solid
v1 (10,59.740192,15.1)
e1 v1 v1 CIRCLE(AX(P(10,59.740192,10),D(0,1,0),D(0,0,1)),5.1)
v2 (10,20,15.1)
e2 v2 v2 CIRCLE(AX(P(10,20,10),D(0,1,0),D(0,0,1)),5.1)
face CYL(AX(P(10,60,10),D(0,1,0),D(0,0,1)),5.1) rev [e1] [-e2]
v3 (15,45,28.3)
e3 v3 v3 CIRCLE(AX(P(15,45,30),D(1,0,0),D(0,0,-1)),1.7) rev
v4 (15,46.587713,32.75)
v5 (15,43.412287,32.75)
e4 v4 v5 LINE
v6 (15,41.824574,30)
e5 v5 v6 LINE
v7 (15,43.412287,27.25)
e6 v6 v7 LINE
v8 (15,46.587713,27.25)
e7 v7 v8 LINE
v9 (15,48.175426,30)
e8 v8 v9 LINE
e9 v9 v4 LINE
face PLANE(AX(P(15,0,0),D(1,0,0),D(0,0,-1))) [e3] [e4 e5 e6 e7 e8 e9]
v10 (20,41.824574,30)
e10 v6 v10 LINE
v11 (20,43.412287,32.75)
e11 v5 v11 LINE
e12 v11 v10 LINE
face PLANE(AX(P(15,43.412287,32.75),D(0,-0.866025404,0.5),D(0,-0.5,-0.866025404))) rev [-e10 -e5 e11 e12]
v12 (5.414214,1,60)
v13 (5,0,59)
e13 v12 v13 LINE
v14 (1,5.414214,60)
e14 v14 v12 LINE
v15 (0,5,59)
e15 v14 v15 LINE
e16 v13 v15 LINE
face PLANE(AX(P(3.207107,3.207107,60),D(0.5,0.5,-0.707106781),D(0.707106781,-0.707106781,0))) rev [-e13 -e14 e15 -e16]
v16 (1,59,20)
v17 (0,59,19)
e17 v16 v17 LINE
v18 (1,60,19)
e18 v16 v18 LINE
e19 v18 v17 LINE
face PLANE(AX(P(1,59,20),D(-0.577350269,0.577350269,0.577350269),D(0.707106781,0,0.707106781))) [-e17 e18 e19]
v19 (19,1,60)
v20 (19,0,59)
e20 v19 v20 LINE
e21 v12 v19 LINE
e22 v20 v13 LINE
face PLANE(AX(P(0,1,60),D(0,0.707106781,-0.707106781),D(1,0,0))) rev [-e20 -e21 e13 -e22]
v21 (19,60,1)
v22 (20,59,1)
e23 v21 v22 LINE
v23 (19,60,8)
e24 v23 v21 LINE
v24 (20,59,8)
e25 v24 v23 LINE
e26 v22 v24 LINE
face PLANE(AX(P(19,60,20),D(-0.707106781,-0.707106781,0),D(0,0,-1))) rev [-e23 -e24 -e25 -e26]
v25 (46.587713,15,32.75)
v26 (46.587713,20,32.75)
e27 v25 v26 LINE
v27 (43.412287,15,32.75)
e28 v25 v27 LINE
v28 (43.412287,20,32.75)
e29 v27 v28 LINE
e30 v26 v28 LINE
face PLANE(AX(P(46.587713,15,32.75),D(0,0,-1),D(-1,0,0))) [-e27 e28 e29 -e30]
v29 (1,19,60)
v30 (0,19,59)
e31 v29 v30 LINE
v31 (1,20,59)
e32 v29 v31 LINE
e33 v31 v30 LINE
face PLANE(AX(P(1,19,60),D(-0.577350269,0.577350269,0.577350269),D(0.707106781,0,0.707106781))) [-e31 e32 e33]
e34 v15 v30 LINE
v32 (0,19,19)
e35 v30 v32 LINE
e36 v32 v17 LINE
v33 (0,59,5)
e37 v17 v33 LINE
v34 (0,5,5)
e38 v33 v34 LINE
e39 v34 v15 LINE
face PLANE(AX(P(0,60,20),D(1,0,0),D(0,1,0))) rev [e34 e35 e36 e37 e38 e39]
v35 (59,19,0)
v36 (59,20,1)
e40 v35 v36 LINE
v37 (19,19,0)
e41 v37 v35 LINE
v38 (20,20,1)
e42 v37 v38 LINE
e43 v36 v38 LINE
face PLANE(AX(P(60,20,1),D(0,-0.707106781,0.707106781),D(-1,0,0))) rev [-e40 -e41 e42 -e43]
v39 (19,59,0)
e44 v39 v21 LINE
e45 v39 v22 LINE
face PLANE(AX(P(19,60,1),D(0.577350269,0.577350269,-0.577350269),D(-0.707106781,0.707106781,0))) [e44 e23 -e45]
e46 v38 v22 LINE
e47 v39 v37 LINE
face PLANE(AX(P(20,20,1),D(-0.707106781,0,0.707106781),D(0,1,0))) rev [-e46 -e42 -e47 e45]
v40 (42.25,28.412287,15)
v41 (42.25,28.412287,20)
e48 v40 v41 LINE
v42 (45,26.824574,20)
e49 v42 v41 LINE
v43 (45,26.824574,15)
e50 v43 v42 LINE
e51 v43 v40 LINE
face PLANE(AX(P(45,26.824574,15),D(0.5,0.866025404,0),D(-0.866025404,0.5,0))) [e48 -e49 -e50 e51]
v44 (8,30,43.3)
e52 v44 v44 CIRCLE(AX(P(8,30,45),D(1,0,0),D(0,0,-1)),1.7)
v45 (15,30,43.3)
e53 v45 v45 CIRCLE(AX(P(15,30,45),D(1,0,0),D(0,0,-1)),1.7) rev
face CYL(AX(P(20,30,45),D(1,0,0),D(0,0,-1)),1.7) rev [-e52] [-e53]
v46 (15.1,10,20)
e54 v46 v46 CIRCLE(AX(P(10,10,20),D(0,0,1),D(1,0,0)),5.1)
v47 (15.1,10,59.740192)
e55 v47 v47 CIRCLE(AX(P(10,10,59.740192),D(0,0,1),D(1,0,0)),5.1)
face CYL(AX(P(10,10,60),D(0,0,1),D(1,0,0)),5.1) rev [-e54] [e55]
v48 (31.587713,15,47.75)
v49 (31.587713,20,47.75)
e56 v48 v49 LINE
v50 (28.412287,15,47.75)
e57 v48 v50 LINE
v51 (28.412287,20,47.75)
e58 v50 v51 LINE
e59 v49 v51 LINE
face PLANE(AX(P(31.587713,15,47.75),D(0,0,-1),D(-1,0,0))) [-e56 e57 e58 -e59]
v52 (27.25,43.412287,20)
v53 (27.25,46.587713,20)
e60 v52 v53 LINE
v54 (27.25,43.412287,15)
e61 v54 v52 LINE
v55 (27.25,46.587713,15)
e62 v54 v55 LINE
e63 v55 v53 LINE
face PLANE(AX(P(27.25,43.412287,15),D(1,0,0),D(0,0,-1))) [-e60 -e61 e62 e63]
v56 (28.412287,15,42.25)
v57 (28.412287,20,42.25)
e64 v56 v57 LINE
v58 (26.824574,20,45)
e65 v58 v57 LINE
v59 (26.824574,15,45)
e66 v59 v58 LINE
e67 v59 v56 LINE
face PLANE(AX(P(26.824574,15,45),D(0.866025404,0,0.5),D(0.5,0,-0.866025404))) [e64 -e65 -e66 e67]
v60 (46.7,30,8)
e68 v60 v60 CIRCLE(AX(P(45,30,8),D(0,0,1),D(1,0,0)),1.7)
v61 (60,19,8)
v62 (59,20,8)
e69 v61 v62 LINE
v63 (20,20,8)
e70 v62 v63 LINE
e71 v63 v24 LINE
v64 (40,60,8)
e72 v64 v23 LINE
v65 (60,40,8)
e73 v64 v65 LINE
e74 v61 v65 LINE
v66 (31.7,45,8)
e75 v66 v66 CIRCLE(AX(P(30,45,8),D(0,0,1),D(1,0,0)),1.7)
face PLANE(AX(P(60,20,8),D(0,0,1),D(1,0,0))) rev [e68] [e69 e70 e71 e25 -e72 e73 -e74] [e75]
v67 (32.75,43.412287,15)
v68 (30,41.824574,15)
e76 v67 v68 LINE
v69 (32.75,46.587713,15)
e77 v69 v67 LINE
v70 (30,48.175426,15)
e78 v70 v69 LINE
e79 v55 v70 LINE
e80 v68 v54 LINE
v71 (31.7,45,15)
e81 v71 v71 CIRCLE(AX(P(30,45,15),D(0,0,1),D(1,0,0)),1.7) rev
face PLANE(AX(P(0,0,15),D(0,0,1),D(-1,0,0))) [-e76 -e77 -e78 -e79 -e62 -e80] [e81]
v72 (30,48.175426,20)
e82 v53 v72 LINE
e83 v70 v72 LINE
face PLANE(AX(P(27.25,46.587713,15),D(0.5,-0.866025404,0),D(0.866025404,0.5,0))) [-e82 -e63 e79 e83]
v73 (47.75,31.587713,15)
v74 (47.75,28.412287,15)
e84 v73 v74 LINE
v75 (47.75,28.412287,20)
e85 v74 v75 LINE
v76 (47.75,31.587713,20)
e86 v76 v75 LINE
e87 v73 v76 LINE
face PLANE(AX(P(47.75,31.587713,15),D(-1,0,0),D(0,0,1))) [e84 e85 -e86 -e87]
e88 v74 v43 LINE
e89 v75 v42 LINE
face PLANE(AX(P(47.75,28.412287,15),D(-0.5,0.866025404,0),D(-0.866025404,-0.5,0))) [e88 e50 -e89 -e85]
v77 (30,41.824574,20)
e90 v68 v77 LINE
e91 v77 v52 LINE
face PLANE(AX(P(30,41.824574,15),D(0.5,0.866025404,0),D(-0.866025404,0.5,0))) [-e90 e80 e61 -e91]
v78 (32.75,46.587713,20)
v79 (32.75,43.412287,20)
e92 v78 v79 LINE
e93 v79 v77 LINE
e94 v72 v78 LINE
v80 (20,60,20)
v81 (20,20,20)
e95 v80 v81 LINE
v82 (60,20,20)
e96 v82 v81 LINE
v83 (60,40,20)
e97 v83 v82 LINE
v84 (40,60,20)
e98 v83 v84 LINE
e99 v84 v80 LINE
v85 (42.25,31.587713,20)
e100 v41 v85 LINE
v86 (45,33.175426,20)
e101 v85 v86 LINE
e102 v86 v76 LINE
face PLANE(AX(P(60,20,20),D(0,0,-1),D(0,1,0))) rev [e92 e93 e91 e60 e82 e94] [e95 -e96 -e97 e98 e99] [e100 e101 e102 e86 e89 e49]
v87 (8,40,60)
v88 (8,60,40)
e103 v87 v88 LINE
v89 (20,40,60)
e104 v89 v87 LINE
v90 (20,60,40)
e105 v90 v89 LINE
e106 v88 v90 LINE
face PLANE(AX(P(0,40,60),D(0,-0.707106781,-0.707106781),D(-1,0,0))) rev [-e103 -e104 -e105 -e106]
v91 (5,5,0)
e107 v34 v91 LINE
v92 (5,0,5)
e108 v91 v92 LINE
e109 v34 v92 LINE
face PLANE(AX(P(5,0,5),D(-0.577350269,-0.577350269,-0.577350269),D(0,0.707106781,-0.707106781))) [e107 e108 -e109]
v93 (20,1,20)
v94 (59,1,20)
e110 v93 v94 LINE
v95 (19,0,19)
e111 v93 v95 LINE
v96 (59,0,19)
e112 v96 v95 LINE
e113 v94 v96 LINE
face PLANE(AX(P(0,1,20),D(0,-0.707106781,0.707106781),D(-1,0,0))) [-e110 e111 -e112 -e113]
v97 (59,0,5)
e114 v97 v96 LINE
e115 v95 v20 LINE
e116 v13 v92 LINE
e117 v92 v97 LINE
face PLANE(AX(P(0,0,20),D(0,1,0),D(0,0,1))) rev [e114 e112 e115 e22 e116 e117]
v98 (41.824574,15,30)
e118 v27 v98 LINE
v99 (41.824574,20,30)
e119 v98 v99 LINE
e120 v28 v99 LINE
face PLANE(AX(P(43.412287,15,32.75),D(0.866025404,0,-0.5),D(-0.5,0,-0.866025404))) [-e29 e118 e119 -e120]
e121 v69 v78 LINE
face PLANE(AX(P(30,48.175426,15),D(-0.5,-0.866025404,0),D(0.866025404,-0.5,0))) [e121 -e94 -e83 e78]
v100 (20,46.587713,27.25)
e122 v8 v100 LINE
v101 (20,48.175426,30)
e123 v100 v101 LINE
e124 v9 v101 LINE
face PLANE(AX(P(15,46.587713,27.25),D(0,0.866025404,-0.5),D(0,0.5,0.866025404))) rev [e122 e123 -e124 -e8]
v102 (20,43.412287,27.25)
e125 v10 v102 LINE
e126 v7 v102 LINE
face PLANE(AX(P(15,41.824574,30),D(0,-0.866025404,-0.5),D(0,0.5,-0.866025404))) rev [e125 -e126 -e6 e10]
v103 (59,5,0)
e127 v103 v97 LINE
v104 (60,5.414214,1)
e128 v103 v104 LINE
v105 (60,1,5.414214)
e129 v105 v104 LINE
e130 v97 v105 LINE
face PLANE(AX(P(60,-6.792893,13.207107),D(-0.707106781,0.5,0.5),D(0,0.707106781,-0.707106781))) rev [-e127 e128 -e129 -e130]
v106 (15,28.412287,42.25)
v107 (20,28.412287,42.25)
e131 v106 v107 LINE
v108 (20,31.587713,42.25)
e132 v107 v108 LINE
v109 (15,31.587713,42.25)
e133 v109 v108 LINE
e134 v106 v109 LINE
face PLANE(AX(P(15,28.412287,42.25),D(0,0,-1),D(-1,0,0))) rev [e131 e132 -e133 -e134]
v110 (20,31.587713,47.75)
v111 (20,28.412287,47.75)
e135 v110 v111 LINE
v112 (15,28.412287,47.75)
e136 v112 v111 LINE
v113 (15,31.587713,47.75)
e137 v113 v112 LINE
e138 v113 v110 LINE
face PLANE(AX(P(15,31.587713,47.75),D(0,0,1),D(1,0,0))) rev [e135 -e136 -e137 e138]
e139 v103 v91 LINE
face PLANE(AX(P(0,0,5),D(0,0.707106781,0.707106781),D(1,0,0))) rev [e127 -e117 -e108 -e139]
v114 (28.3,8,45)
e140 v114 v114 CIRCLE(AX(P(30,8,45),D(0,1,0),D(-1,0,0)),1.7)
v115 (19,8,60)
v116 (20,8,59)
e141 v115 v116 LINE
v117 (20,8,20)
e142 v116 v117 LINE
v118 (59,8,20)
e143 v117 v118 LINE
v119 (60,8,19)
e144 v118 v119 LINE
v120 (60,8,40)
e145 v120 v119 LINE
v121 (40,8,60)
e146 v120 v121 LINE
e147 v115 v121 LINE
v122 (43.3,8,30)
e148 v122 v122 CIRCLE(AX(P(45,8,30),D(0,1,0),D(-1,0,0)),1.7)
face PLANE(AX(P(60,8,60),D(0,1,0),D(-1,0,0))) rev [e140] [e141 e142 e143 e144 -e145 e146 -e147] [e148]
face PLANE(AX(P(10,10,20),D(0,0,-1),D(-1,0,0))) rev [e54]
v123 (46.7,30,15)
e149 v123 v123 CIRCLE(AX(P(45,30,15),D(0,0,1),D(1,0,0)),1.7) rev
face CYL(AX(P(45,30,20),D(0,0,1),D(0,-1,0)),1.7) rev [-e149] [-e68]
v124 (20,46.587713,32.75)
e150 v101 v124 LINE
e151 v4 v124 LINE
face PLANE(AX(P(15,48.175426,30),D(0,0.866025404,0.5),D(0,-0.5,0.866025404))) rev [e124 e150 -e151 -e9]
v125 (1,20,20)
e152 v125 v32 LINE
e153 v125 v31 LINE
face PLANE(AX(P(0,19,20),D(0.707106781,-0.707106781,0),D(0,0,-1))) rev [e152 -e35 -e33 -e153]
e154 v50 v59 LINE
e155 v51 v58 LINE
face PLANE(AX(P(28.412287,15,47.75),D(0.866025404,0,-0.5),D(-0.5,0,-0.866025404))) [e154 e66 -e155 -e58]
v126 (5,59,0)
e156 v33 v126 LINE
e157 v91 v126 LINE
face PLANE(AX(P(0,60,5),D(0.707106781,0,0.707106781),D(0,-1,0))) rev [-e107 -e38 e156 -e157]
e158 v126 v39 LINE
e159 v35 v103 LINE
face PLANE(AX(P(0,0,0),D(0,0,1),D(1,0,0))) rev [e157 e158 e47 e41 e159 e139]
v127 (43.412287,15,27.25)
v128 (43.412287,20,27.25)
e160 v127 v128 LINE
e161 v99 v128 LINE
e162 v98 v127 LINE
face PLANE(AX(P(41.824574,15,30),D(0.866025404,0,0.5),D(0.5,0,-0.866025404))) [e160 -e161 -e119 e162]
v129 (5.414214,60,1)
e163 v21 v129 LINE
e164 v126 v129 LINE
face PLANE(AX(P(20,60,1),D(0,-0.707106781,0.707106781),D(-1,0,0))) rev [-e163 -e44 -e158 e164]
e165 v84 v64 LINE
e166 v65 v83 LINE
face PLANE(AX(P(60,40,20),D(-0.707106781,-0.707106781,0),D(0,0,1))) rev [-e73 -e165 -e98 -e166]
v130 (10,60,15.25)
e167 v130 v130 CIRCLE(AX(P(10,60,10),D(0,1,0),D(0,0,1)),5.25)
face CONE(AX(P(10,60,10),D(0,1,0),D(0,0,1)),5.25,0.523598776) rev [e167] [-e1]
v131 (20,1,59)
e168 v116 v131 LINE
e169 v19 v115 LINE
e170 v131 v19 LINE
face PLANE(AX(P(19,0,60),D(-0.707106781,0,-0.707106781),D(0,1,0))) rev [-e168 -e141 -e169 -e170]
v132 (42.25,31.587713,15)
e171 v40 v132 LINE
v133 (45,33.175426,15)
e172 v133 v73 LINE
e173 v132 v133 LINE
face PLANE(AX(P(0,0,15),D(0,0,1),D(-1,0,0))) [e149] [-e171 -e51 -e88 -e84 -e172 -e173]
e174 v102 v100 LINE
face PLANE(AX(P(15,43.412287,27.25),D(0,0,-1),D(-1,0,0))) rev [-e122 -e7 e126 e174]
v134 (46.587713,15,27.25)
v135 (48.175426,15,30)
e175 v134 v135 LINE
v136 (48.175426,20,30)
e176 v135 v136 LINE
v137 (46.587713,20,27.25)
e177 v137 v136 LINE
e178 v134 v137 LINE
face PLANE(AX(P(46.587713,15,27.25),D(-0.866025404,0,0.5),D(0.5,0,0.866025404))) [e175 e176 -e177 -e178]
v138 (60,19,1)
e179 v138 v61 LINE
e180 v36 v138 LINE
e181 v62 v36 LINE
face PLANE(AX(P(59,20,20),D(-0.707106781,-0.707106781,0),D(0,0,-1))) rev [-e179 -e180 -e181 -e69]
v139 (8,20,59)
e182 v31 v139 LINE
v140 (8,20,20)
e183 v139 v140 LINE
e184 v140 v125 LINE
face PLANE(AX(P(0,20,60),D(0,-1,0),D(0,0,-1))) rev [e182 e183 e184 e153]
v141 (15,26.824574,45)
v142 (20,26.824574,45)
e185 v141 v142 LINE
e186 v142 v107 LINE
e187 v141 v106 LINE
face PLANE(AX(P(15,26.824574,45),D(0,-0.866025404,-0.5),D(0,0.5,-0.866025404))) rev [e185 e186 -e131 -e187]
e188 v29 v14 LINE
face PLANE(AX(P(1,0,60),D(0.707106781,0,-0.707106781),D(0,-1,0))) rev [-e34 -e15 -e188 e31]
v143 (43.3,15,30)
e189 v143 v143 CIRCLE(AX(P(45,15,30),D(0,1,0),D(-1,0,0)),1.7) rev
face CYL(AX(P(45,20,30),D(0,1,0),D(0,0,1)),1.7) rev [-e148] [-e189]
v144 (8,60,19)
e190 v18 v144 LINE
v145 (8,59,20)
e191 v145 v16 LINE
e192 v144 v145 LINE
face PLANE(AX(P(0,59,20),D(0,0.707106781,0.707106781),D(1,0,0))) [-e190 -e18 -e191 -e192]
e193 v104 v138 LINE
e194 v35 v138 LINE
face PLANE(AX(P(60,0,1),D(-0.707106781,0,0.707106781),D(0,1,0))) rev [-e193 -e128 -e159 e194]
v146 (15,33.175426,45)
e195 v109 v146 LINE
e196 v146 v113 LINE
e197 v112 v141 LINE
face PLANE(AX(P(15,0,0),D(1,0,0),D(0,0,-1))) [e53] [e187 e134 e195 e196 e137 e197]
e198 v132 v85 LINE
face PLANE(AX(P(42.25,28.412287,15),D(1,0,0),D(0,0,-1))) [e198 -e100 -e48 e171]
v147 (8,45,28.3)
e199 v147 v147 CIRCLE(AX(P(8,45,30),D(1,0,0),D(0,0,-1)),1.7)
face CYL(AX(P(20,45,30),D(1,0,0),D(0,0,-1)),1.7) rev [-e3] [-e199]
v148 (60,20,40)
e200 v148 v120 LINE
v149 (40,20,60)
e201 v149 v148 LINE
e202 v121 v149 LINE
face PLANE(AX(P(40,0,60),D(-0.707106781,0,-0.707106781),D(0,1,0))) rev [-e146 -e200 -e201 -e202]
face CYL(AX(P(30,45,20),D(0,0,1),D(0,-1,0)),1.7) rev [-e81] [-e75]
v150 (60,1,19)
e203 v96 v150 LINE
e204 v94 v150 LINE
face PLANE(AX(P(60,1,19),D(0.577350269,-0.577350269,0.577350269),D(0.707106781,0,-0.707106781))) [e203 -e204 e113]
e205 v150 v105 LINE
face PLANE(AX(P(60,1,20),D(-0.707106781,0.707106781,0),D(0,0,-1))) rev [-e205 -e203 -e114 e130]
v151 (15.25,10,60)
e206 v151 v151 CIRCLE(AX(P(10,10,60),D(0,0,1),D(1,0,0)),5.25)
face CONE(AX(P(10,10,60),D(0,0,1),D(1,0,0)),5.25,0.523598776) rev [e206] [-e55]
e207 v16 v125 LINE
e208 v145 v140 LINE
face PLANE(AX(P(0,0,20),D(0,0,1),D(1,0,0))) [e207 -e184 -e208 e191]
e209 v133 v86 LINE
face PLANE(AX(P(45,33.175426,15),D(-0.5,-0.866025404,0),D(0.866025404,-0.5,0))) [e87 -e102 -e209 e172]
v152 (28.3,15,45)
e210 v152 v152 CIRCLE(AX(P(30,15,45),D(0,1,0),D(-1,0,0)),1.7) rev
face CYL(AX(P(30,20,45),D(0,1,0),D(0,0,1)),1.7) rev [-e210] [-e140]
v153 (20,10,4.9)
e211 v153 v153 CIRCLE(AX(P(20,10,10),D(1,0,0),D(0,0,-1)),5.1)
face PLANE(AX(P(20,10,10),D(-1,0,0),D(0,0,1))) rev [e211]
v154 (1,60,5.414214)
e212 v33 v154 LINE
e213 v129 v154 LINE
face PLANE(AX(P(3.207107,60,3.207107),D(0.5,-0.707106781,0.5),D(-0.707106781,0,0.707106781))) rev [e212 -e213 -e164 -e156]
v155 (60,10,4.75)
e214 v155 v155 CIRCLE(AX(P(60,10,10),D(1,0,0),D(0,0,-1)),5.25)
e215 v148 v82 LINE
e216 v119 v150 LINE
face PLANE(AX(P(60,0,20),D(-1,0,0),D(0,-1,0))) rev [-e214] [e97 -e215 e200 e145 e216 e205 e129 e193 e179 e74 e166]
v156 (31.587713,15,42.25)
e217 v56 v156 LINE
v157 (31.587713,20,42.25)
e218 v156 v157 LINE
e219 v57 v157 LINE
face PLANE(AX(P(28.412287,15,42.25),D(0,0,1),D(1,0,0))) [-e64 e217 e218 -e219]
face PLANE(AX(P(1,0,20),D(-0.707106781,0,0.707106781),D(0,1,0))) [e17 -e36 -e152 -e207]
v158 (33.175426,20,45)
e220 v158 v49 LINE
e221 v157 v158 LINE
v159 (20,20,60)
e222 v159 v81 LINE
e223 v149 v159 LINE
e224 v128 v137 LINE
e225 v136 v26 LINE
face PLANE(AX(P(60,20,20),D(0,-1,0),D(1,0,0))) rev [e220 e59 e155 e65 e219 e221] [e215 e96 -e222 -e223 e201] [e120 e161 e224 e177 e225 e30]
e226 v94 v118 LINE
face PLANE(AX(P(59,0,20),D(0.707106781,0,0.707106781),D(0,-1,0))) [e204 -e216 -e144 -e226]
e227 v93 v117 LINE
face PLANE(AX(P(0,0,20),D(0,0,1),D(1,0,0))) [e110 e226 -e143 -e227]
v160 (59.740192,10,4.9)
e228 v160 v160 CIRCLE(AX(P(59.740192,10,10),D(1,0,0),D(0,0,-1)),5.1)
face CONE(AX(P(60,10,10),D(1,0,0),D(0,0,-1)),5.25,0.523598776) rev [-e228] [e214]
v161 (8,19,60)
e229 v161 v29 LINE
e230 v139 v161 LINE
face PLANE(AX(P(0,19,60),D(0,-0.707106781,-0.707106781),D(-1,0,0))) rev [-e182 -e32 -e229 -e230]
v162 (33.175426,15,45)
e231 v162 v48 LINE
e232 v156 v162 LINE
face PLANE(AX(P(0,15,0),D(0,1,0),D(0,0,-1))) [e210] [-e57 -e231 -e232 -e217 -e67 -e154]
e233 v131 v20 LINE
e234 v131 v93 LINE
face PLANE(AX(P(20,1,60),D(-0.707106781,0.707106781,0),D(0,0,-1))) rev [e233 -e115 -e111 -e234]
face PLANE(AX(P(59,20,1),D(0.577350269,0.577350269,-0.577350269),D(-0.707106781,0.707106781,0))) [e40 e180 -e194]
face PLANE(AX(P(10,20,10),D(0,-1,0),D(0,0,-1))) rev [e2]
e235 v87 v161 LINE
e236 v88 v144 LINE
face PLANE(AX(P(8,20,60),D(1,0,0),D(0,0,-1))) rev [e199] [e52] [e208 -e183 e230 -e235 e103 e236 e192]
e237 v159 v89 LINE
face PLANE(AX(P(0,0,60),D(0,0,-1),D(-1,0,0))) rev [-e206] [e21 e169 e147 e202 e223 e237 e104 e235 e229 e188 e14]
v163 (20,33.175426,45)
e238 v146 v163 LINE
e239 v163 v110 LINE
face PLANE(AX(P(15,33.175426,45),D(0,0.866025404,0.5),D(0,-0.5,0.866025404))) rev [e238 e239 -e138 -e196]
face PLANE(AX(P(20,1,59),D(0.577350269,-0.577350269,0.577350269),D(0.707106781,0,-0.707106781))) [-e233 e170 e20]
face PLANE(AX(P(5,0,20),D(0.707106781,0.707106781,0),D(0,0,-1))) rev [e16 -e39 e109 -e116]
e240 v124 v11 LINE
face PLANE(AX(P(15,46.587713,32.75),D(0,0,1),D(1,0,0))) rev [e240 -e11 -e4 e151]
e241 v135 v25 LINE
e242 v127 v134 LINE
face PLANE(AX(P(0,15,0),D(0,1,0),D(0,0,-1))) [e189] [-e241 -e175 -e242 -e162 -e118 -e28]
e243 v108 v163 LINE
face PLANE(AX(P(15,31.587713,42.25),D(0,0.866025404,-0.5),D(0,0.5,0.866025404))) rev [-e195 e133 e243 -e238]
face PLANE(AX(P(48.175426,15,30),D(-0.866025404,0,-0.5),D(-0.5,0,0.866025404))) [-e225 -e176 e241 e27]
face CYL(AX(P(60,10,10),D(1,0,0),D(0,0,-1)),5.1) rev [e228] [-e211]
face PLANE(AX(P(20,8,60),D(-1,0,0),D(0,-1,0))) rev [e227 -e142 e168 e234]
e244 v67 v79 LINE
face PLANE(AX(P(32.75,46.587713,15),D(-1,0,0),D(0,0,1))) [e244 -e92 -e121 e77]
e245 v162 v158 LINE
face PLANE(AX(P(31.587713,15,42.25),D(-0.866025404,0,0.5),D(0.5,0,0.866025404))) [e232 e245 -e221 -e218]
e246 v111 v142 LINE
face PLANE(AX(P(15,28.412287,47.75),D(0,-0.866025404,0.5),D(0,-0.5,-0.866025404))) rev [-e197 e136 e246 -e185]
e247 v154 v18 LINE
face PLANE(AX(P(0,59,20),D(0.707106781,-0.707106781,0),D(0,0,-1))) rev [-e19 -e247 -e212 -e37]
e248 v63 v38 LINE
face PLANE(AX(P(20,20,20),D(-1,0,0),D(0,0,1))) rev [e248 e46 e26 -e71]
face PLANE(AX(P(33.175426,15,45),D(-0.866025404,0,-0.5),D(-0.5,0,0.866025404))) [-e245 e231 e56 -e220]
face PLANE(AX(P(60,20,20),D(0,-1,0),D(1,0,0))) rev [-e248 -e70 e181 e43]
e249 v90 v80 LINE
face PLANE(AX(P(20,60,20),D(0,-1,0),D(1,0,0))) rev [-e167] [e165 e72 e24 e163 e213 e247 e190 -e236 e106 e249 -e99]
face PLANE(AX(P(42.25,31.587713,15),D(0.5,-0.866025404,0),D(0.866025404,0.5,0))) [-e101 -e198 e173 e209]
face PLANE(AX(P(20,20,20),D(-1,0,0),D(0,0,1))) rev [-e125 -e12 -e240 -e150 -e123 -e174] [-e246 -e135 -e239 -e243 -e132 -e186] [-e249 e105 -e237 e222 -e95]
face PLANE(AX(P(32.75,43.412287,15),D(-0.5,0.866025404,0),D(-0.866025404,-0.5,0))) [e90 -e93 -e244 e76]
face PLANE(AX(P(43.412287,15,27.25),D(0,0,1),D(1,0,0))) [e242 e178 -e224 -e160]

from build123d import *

# Parameters (mm, degrees)
BASE_SHAPE_BASE_DEPTH        = 20
BASE_SHAPE_EXTENSION_DEPTH   = 40
BASE_SHAPE_FINISH_SKETCH_W   = 12
BASE_SHAPE_FINISH_SKETCH_H   = 40
BASE_SHAPE_WALL_DEPTH        = 40
ROD_HOLE_D10_Z_D             = 10.2
ROD_HOLE_D10_Z_DEPTH         = 40
ROD_HOLE_D10_Z_CSINK_D       = 10.5
ROD_HOLE_D10_Z_CSINK_ANGLE   = 60
ROD_HOLE_D10_X_D             = 10.2
ROD_HOLE_D10_X_DEPTH         = 40
ROD_HOLE_D10_X_CSINK_D       = 10.5
ROD_HOLE_D10_X_CSINK_ANGLE   = 60
ROD_HOLE_D10_Y_D             = 10.2
ROD_HOLE_D10_Y_DEPTH         = 40
ROD_HOLE_D10_Y_CSINK_D       = 10.5
ROD_HOLE_D10_Y_CSINK_ANGLE   = 60
OUTER_CHAMFERS_SIZE          = 5
INNER_SMALLER_CHAMFERS_SIZE  = 1
LARGE_CHAMFERS_SIZE          = 20
HULL_PART_HOLES_M3_START     = 8
HULL_PART_HOLES_M3_OUTLINE_R = 1.7
HULL_PART_HOLES_M3_DEPTH     = 12
HULL_PART_NUT_HOLE_DEPTH     = 5


# Read off the part's stored shape, not the designer's step: hull_part_holes_m3
with BuildPart() as part:
    # base_shape_sketch → base_shape_base (new body)
    with BuildSketch(Plane.XY):
        Polygon((0, 0), (60, 0), (60, 20), (20, 20), (20, 60), (0, 60), align=None)
    extrude(amount=BASE_SHAPE_BASE_DEPTH)

    # base_shape_extension_sketch → base_shape_extension (add)
    with BuildSketch(Plane.XY.offset(20)):
        Polygon((20, 60), (20, 20), (60, 20), (60, 8), (20, 8), (20, 0), (0, 0), (0, 20), (8, 20), (8, 60), align=None)
    extrude(amount=BASE_SHAPE_EXTENSION_DEPTH)

    # base_shape_finish_sketch → base_shape_wall (add)
    with BuildSketch(Plane(origin=(20, 0, 0), x_dir=(0, 0, -1), z_dir=(1, 0, 0))):
        with Locations((-14, 40)):
            Rectangle(BASE_SHAPE_FINISH_SKETCH_W, BASE_SHAPE_FINISH_SKETCH_H)
    extrude(amount=BASE_SHAPE_WALL_DEPTH)

    # rod_hole_d10_z
    with Locations(Plane.XY.offset(60)):
        with Locations((10, 10)):
            CounterSinkHole(ROD_HOLE_D10_Z_D / 2, ROD_HOLE_D10_Z_CSINK_D / 2, depth=ROD_HOLE_D10_Z_DEPTH, counter_sink_angle=ROD_HOLE_D10_Z_CSINK_ANGLE)

    # rod_hole_d10_x
    with Locations(Plane(origin=(60, 0, 0), x_dir=(0, 0, -1), z_dir=(1, 0, 0))):
        with Locations((-10, 10)):
            CounterSinkHole(ROD_HOLE_D10_X_D / 2, ROD_HOLE_D10_X_CSINK_D / 2, depth=ROD_HOLE_D10_X_DEPTH, counter_sink_angle=ROD_HOLE_D10_X_CSINK_ANGLE)

    # rod_hole_d10_y
    with Locations(Plane(origin=(0, 60, 0), x_dir=(1, 0, 0), z_dir=(0, 1, 0))):
        with Locations((10, -10)):
            CounterSinkHole(ROD_HOLE_D10_Y_D / 2, ROD_HOLE_D10_Y_CSINK_D / 2, depth=ROD_HOLE_D10_Y_DEPTH, counter_sink_angle=ROD_HOLE_D10_Y_CSINK_ANGLE)

    # outer_chamfers
    outer_chamfers_edges = [part.edges().sort_by_distance(p)[0] for p in [
        (0, 0, 30),
        (30, 0, 0),
        (0, 30, 0),
    ]]
    chamfer(outer_chamfers_edges, length=OUTER_CHAMFERS_SIZE)

    # inner_smaller_chamfers
    inner_smaller_chamfers_edges = [part.edges().sort_by_distance(p)[0] for p in [
        (0, 60, 12.5),
        (60, 0, 12.5),
        (60, 4, 20),
        (40, 0, 20),
        (4, 60, 20),
        (0, 20, 40),
        (20, 0, 40),
        (4, 20, 60),
        (0, 12.5, 60),
        (20, 4, 60),
        (20, 60, 4),
        (0, 40, 20),
        (60, 20, 4),
        (12.5, 60, 0),
        (20, 40, 0),
        (40, 20, 0),
        (12.5, 0, 60),
        (2.5, 2.5, 60),
        (60, 12.5, 0),
        (60, 2.5, 2.5),
        (2.5, 60, 2.5),
    ]]
    chamfer(inner_smaller_chamfers_edges, length=INNER_SMALLER_CHAMFERS_SIZE)

    # large_chamfers
    large_chamfers_edges = [part.edges().sort_by_distance(p)[0] for p in [
        (14, 60, 60),
        (60, 14, 60),
        (60, 60, 14),
    ]]
    chamfer(large_chamfers_edges, length=LARGE_CHAMFERS_SIZE)

    # hull_part_holes_m3 outline → hull_part_holes_m3 (cut)
    with BuildSketch(Plane.YZ.offset(HULL_PART_HOLES_M3_START)):
        with Locations((45, 30)):
            Circle(HULL_PART_HOLES_M3_OUTLINE_R)
        with Locations((30, 45)):
            Circle(HULL_PART_HOLES_M3_OUTLINE_R)
    hull_part_holes_m3 = extrude(amount=HULL_PART_HOLES_M3_DEPTH, mode=Mode.SUBTRACT)

    # Sketch12 → hull_part_nut_hole (cut)
    with BuildSketch(Plane(origin=(20, 0, 0), x_dir=(0, 0, -1), z_dir=(1, 0, 0))):
        Polygon((-30, 48.175426481), (-32.75, 46.58771324), (-32.75, 43.41228676), (-30, 41.824573519), (-27.25, 43.41228676), (-27.25, 46.58771324), align=None)
        Polygon((-45, 33.175426481), (-47.75, 31.58771324), (-47.75, 28.41228676), (-45, 26.824573519), (-42.25, 28.41228676), (-42.25, 31.58771324), align=None)
    hull_part_nut_hole = extrude(amount=-HULL_PART_NUT_HOLE_DEPTH, mode=Mode.SUBTRACT)

    # hull_part_holes_mirror_x: hull_part_holes_m3, hull_part_nut_hole across plane
    add(hull_part_holes_m3.mirror(Plane(origin=(0, 0, 0), x_dir=(0.7071067811865482, 0, 0.7071067811865468), z_dir=(-0.707106781186547, 0, 0.7071067811865481))), mode=Mode.SUBTRACT)
    add(hull_part_nut_hole.mirror(Plane(origin=(0, 0, 0), x_dir=(0.7071067811865482, 0, 0.7071067811865468), z_dir=(-0.707106781186547, 0, 0.7071067811865481))), mode=Mode.SUBTRACT)

    # hull_part_holes_mirror_y: hull_part_holes_m3, hull_part_nut_hole across plane
    add(hull_part_holes_m3.mirror(Plane(origin=(0, 0, 0), x_dir=(0, 0, 1), z_dir=(-0.7071067811865482, 0.7071067811865469, 0))), mode=Mode.SUBTRACT)
    add(hull_part_nut_hole.mirror(Plane(origin=(0, 0, 0), x_dir=(0, 0, 1), z_dir=(-0.7071067811865482, 0.7071067811865469, 0))), mode=Mode.SUBTRACT)


solid = part.part
